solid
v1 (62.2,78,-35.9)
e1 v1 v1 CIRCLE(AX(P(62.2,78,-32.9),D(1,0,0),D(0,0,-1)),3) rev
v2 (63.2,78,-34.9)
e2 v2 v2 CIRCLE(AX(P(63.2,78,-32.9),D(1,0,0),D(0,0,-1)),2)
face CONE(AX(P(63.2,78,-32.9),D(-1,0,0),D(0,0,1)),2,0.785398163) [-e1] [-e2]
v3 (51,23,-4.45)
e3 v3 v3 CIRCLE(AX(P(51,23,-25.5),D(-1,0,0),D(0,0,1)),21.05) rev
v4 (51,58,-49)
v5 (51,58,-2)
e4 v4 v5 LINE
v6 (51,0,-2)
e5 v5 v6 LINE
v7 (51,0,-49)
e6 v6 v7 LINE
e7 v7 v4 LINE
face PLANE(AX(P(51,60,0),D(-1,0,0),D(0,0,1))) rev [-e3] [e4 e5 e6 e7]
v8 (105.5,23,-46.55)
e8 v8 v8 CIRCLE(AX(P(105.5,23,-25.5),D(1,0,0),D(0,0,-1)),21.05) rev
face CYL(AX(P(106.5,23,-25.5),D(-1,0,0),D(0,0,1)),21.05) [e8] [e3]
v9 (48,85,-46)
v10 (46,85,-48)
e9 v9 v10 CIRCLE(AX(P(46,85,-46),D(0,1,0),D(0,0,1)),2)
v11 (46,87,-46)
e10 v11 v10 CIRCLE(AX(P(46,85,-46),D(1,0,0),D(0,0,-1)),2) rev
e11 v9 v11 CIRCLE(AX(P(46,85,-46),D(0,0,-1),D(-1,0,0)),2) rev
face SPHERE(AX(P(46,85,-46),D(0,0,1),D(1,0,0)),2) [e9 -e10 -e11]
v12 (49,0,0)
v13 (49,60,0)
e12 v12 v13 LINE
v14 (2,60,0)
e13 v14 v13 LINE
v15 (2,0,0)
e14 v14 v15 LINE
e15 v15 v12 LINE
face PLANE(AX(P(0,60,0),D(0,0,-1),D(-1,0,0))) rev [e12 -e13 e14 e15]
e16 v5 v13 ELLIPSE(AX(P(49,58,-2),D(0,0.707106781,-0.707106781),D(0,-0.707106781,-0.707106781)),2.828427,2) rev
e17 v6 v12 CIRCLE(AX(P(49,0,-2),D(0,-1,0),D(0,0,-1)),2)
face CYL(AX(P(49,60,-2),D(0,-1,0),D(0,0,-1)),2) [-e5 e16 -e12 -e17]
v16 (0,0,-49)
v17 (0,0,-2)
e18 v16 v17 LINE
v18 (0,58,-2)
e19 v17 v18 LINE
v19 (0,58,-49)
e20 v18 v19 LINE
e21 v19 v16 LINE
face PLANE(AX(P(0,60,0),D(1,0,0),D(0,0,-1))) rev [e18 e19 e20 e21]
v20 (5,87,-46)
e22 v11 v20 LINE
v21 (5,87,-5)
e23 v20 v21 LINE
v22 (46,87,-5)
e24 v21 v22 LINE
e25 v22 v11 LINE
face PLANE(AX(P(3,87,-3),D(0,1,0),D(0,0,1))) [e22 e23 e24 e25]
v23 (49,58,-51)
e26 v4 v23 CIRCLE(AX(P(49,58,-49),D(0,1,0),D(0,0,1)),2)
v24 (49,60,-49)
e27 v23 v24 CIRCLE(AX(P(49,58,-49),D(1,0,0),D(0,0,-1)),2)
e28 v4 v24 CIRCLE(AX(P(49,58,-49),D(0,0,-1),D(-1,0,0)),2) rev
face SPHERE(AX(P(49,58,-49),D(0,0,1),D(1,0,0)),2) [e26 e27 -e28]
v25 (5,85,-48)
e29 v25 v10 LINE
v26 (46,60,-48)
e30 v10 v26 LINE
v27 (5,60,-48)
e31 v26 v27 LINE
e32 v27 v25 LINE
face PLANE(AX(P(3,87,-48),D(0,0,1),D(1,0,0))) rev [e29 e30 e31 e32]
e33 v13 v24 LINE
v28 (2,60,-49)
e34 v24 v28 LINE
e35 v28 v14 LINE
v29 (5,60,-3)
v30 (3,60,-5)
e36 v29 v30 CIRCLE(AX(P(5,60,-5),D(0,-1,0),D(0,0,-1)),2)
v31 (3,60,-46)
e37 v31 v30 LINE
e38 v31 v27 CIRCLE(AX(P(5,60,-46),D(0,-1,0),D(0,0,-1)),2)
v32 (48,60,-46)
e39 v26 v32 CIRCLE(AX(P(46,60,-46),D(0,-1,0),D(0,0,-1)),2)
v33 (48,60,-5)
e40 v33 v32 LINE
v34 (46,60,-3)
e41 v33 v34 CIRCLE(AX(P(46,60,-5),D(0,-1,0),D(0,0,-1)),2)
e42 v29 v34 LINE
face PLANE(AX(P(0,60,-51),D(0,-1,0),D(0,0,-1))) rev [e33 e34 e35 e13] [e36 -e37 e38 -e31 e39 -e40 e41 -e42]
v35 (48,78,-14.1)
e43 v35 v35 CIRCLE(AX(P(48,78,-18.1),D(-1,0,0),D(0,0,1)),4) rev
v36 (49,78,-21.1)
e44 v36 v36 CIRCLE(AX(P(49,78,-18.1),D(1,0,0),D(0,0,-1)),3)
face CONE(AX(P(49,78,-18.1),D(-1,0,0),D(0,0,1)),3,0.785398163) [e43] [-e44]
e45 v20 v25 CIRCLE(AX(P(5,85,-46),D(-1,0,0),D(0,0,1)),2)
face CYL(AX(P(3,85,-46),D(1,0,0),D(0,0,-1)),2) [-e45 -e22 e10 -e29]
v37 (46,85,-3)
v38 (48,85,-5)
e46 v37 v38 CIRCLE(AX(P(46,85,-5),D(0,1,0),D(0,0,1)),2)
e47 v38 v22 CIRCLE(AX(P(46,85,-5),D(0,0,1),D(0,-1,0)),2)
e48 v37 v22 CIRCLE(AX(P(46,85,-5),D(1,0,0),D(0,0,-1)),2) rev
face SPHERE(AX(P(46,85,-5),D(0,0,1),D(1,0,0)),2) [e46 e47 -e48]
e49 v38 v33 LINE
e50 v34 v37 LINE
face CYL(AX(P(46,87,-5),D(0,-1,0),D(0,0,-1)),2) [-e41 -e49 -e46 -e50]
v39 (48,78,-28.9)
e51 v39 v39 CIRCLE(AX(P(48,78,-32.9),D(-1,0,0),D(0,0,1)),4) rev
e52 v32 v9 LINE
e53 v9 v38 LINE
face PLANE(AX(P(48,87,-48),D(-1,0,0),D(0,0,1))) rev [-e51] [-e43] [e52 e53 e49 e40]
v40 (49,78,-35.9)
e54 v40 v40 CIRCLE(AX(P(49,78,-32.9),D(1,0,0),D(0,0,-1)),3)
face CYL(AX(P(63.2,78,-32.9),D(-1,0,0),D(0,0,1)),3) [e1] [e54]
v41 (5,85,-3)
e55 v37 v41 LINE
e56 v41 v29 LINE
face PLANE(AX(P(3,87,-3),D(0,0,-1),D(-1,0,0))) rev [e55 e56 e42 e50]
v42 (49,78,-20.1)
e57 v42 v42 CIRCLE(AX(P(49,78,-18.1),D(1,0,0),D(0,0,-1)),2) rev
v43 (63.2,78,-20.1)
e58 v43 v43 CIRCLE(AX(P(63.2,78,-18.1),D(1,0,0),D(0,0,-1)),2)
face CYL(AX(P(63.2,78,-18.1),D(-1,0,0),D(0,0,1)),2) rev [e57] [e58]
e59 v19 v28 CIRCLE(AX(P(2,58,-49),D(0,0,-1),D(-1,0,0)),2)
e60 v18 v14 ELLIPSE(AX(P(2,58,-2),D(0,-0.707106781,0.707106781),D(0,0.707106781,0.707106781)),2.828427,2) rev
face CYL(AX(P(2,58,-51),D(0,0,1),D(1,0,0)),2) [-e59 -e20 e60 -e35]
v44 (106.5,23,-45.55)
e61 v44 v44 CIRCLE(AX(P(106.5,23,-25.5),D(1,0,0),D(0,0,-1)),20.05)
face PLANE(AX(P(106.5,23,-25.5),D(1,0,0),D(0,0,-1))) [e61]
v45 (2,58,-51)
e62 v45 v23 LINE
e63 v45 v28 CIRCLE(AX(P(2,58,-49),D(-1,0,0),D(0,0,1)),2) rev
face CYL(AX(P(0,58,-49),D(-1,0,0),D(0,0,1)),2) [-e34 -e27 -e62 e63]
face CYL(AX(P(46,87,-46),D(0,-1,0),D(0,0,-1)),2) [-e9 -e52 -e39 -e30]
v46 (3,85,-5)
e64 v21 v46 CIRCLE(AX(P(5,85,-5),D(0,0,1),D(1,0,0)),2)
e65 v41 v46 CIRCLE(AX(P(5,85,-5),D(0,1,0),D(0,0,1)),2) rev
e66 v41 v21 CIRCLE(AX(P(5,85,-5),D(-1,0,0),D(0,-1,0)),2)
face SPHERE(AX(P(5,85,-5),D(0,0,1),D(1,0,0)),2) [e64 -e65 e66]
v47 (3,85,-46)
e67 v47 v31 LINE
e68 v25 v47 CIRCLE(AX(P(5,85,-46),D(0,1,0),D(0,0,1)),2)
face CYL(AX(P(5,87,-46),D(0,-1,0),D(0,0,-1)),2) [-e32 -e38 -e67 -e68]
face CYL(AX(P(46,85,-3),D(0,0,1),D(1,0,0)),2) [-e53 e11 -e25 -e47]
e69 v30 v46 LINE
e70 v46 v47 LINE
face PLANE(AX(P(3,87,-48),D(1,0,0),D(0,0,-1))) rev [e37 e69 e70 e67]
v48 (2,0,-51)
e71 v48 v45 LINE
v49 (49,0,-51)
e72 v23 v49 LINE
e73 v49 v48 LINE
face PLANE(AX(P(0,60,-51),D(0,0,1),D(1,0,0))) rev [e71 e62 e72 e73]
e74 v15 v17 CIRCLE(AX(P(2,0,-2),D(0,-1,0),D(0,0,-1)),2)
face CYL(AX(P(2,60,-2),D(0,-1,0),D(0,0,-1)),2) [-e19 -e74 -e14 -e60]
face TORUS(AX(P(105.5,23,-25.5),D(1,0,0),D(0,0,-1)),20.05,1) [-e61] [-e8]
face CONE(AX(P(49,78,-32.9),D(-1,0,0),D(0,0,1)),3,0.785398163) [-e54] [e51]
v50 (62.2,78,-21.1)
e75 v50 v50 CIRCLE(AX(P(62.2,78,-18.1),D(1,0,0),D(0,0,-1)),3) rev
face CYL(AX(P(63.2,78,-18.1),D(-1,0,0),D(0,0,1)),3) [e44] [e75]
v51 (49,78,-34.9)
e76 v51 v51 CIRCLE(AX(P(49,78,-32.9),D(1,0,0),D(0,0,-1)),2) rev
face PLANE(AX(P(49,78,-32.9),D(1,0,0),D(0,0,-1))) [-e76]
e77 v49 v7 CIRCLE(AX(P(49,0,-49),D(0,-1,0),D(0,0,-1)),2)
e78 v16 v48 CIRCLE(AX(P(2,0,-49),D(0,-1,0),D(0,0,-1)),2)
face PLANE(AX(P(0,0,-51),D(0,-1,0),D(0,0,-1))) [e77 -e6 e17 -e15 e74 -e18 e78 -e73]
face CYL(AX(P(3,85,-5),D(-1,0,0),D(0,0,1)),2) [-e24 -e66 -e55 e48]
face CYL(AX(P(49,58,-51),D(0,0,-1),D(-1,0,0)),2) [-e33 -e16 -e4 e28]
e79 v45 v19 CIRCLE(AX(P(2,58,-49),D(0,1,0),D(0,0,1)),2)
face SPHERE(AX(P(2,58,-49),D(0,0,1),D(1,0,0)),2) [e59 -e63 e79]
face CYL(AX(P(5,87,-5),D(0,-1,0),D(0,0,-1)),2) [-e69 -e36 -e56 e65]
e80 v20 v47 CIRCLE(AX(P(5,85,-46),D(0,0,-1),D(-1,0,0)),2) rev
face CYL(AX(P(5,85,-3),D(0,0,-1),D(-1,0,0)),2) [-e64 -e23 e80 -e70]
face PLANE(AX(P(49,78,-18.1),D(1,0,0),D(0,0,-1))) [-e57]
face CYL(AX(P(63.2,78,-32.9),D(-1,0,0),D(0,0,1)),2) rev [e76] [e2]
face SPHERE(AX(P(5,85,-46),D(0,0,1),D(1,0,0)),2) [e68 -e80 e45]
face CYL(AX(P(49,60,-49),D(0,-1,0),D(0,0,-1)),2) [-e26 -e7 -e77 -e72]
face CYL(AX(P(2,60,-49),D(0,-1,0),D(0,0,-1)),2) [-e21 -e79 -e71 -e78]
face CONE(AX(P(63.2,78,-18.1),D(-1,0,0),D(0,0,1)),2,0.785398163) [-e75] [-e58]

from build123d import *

# Parameters (mm, degrees)
ESQUISSE1_W        = 51
ESQUISSE1_H        = 51
BOSS_EXTRU_1_DEPTH = 60
ESQUISSE2_W        = 45
ESQUISSE2_H        = 45
BOSS_EXTRU_2_DEPTH = 27
ESQUISSE3_R        = 21.05
BOSS_EXTRU_3_DEPTH = 55.5
ESQUISSE4_R        = 4
BOSS_EXTRU_4_DEPTH = 1
ESQUISSE5_R        = 3
ESQUISSE5_R_2      = 2
BOSS_EXTRU_5_DEPTH = 14.2
CHANFREIN1_SIZE    = 1
CONG_1_R           = 2
CONG_2_R           = 2
CONG_3_R           = 1


with BuildPart() as part:
    # Esquisse1 → Boss.-Extru.1 (new body)
    with BuildSketch(Plane(origin=(0, 0, 0), x_dir=(1, 0, 0), z_dir=(0, 1, 0))):
        with Locations((25.5, 25.5)):
            Rectangle(ESQUISSE1_W, ESQUISSE1_H)
    extrude(amount=BOSS_EXTRU_1_DEPTH)

    # Esquisse2 → Boss.-Extru.2 (add)
    with BuildSketch(Plane(origin=(0, 60, 0), x_dir=(1, 0, 0), z_dir=(0, 1, 0))):
        with Locations((25.5, 25.5)):
            Rectangle(ESQUISSE2_W, ESQUISSE2_H)
    extrude(amount=BOSS_EXTRU_2_DEPTH)

    # Esquisse3 → Boss.-Extru.3 (add)
    with BuildSketch(Plane(origin=(51, 0, 0), x_dir=(0, 0, -1), z_dir=(1, 0, 0))):
        with Locations(Location((25.5, 23, 0), (0, 0, 180))):
            Circle(ESQUISSE3_R)
    extrude(amount=BOSS_EXTRU_3_DEPTH)

    # Esquisse4 → Boss.-Extru.4 (add)
    with BuildSketch(Plane(origin=(48, 0, 0), x_dir=(0, 0, -1), z_dir=(1, 0, 0))):
        with Locations(Location((18.1, 78, 0), (0, 0, 180))):
            Circle(ESQUISSE4_R)
        with Locations(Location((32.9, 78, 0), (0, 0, 180))):
            Circle(ESQUISSE4_R)
    extrude(amount=BOSS_EXTRU_4_DEPTH)

    # Esquisse5 → Boss.-Extru.5 (add)
    # profile 1 of 2: a face of its own
    with BuildSketch(Plane(origin=(49, 0, 0), x_dir=(0, 0, -1), z_dir=(1, 0, 0))):
        with Locations((18.1, 78)):
            Circle(ESQUISSE5_R)
        with Locations((18.1, 78)):
            Circle(ESQUISSE5_R_2, mode=Mode.SUBTRACT)
    # profile 2 of 2: a face of its own
    with BuildSketch(Plane(origin=(49, 0, 0), x_dir=(0, 0, -1), z_dir=(1, 0, 0))):
        with Locations((32.9, 78)):
            Circle(ESQUISSE5_R)
        with Locations((32.9, 78)):
            Circle(ESQUISSE5_R_2, mode=Mode.SUBTRACT)
    extrude(amount=BOSS_EXTRU_5_DEPTH)

    # Chanfrein1
    chanfrein1_edges = [part.edges().sort_by_distance(p)[0] for p in [
        (49, 78, -22.1),
        (49, 78, -36.9),
        (63.2, 78, -15.1),
        (63.2, 78, -29.9),
    ]]
    chamfer(chanfrein1_edges, length=CHANFREIN1_SIZE - 0.0001)  # a hair under: the kernel refuses the full size

    # Congé1
    cong_1_edges = [part.edges().sort_by_distance(p)[0] for p in [
        (3, 73.5, -48),
        (3, 73.5, -3),
        (48, 73.5, -3),
        (48, 73.5, -48),
        (3, 87, -25.5),
        (25.5, 87, -3),
        (48, 87, -25.5),
        (25.5, 87, -48),
    ]]
    fillet(cong_1_edges, radius=CONG_1_R)

    # Congé2
    cong_2_edges = [part.edges().sort_by_distance(p)[0] for p in [
        (51, 60, -25.5),
        (25.5, 60, -51),
        (0, 60, -25.5),
        (0, 30, -51),
        (51, 30, -51),
        (51, 30, 0),
        (0, 30, 0),
    ]]
    fillet(cong_2_edges, radius=CONG_2_R)

    # Congé3
    cong_3_edges = [part.edges().sort_by_distance(p)[0] for p in [
        (106.5, 23, -46.55),
    ]]
    fillet(cong_3_edges, radius=CONG_3_R)


solid = part.part
